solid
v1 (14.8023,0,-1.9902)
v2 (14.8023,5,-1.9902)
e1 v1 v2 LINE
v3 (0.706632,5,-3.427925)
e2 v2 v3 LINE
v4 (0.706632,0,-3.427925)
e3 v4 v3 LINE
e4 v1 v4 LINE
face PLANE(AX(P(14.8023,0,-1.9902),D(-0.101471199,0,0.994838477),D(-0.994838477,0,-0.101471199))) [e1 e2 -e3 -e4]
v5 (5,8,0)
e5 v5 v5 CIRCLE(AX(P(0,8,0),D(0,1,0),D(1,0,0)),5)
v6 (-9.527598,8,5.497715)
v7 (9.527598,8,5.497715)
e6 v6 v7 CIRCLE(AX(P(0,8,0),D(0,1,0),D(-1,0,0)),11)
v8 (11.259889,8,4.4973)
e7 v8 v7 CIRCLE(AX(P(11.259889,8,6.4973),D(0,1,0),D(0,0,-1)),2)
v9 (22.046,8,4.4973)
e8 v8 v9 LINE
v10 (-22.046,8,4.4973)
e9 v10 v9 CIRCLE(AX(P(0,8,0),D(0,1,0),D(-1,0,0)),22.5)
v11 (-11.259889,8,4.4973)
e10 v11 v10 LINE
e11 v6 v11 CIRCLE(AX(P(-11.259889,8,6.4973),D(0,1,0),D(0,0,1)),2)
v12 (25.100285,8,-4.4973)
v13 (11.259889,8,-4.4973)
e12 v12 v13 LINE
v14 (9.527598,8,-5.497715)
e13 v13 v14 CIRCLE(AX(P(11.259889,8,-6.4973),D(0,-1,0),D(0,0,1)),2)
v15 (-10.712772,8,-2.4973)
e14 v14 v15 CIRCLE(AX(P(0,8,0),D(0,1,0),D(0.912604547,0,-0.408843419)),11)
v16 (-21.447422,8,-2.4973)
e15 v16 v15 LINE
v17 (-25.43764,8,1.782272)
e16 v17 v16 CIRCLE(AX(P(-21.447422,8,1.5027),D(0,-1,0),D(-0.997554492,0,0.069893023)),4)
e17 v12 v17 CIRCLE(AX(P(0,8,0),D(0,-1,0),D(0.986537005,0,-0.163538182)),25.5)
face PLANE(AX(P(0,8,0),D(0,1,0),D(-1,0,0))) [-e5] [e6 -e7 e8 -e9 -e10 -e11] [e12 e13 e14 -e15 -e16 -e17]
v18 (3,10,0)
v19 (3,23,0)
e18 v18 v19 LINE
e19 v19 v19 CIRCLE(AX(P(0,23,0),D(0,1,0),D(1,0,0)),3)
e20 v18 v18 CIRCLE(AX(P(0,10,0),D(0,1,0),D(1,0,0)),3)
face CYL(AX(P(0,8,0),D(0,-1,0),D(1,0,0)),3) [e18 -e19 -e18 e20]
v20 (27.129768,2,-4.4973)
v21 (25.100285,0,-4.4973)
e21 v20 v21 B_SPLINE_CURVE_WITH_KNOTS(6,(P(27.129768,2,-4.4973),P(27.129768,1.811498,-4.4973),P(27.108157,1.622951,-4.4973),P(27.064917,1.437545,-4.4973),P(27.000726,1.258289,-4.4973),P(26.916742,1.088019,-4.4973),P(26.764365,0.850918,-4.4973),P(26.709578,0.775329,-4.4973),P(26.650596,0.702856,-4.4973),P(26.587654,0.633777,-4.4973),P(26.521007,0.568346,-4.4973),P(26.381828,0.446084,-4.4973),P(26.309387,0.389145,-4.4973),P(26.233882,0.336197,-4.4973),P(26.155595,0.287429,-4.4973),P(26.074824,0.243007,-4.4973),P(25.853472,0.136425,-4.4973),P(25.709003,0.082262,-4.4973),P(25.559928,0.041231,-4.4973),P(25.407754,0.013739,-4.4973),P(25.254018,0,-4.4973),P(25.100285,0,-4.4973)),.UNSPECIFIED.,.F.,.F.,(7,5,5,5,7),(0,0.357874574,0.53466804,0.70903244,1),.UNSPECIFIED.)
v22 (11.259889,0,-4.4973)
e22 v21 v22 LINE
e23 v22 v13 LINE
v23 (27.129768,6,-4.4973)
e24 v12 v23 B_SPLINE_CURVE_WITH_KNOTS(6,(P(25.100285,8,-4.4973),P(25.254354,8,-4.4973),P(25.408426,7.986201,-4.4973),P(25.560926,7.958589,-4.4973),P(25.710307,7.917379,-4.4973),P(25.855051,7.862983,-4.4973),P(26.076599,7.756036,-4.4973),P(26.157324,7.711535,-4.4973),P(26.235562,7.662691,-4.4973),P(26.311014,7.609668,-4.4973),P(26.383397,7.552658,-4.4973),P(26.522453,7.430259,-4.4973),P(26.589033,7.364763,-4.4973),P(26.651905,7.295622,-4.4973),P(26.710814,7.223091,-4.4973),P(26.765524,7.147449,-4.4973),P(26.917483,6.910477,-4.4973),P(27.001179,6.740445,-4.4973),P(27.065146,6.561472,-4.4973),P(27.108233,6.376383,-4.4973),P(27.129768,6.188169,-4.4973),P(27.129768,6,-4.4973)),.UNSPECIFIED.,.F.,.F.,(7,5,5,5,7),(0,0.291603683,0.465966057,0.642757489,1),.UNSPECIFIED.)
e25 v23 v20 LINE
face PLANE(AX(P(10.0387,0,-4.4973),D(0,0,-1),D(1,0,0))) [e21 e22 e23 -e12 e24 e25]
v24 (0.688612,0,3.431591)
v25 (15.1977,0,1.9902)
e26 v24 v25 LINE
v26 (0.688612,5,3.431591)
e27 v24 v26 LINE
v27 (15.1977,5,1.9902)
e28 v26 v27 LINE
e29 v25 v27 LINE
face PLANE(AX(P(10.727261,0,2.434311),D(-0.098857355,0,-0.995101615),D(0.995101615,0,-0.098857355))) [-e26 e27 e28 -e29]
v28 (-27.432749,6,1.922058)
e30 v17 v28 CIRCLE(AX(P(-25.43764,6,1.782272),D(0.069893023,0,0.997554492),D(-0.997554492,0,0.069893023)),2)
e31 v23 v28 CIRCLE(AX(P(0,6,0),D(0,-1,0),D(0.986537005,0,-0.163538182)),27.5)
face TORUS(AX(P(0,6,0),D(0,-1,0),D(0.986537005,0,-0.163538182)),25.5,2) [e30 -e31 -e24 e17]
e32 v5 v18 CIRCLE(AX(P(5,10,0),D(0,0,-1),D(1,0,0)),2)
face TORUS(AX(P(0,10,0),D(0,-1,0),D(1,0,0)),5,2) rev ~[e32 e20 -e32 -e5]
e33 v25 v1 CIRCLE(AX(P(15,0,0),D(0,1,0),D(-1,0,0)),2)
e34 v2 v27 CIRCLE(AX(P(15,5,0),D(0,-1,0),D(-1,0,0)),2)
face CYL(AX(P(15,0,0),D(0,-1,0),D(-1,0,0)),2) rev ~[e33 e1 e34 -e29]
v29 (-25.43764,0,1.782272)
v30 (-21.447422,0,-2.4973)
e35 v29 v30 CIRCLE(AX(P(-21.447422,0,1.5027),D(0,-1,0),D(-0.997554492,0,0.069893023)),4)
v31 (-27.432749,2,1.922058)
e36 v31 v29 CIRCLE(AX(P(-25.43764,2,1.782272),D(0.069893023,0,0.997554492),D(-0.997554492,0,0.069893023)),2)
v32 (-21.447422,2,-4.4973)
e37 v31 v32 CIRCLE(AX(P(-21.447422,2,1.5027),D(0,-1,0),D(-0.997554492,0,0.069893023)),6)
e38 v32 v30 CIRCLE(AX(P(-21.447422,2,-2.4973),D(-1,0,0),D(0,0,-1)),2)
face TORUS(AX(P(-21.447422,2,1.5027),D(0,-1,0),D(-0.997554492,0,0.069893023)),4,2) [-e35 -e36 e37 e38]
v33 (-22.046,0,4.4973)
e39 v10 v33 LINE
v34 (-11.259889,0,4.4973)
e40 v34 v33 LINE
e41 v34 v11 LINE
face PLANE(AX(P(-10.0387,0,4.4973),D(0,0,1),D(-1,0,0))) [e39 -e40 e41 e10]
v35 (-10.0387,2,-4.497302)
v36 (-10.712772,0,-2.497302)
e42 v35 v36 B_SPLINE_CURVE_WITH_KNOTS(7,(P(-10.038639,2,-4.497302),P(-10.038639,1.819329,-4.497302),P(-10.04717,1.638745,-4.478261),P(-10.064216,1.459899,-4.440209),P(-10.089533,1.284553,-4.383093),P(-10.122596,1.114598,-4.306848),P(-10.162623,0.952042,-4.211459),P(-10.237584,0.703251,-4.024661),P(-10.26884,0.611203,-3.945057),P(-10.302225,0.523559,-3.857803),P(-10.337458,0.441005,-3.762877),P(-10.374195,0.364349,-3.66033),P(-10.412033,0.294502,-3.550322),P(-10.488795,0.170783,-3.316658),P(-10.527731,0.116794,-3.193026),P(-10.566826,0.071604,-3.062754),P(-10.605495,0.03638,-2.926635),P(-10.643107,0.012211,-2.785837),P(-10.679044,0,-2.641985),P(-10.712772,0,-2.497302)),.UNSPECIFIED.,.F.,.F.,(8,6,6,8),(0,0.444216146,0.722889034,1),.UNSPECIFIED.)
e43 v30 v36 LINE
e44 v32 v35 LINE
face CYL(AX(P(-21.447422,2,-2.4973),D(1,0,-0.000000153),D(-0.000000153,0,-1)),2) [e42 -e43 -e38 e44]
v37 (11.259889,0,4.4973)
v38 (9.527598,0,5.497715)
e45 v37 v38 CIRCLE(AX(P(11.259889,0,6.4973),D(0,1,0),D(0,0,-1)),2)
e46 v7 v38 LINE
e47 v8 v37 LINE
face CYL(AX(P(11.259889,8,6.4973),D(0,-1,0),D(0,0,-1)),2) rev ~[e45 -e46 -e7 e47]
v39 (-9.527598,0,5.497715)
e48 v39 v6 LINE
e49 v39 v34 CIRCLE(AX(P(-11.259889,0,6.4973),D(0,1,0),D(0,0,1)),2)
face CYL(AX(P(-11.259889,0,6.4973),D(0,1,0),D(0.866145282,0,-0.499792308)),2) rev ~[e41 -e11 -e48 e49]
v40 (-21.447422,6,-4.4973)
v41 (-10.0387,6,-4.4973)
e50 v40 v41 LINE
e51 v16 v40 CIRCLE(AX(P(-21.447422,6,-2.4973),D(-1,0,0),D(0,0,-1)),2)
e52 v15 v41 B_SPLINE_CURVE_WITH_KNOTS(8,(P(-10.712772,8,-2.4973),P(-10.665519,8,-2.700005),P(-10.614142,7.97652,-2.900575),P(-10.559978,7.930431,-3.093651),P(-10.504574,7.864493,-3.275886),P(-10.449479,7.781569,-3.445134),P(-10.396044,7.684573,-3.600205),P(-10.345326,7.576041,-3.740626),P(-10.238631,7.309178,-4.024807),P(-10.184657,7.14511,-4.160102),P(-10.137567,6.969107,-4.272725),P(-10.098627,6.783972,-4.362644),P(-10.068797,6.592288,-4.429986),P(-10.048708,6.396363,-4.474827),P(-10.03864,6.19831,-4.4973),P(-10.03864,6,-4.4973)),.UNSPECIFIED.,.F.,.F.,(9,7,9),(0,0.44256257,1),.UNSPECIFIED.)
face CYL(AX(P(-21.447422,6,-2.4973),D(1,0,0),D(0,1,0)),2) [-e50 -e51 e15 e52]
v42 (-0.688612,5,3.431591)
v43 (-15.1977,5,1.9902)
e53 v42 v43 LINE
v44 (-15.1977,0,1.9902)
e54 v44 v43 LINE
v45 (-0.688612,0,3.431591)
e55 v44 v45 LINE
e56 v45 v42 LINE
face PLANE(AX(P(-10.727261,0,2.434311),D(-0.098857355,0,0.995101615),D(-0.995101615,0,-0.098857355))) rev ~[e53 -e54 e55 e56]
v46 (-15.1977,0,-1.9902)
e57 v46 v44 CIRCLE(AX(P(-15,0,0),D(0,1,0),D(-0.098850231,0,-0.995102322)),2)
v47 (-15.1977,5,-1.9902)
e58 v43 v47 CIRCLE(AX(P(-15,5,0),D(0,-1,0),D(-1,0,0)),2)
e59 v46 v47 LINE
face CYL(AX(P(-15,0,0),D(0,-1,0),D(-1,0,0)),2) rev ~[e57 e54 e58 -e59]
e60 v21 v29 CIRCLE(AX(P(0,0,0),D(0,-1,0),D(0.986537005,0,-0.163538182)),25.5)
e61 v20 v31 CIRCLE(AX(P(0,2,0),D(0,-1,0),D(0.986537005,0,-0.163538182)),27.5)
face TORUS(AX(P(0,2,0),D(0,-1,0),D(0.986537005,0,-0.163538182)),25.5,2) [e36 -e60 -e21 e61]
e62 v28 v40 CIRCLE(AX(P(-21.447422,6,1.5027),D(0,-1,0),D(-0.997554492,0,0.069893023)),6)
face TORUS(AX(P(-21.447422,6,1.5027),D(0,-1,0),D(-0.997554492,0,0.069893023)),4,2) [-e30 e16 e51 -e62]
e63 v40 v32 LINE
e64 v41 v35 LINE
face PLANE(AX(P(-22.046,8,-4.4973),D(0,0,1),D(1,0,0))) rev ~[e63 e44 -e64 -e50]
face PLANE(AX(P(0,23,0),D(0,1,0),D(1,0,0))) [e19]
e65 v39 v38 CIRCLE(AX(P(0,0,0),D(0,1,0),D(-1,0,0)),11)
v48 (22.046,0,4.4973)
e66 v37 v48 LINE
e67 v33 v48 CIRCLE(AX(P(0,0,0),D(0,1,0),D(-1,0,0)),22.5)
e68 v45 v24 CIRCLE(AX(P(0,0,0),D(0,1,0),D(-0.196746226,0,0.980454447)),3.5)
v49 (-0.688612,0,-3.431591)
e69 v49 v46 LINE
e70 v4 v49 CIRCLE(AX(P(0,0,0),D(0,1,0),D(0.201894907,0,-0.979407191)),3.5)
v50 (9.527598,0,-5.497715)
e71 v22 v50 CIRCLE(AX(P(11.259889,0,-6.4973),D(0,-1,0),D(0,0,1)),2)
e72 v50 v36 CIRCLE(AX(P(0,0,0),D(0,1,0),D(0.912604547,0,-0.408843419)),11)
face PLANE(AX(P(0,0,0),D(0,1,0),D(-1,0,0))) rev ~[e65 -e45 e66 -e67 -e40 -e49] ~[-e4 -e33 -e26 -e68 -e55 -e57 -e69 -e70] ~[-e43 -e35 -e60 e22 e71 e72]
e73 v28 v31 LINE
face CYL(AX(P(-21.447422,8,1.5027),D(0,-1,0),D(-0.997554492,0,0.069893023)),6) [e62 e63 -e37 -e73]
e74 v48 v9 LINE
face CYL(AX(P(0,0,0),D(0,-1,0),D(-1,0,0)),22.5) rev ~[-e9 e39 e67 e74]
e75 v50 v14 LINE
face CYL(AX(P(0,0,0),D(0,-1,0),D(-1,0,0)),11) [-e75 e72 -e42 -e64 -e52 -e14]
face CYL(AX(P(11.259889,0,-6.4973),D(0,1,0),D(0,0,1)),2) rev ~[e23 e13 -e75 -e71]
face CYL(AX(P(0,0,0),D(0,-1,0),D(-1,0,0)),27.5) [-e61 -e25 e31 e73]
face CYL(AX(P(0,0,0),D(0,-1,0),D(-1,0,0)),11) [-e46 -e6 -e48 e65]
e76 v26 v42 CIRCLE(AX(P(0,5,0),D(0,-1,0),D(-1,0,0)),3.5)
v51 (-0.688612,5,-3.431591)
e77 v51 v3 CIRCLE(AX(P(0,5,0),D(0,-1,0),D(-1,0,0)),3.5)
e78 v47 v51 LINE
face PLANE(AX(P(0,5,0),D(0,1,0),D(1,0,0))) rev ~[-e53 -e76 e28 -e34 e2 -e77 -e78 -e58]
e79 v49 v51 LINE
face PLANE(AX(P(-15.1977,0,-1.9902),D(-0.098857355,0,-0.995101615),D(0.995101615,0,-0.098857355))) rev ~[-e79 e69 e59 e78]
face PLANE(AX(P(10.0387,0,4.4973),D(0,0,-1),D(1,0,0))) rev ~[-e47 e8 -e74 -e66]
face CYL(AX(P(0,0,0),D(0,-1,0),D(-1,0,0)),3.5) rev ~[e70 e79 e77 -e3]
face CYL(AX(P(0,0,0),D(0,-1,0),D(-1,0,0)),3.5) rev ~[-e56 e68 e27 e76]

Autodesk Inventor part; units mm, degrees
ref_plane "XZ Plane" through (0, 0, 0) normal (0, 1, 0) x (-1, 0, 0)
ref_plane "XY Plane" through (0, 0, 0) normal (0, 0, 1) x (1, 0, 0)
sketch "Skizze1" plane through (0, 0, 0) normal (0, 1, 0) x (-1, 0, 0)
  circle A0 centre (0, 0) radius 27.5
  circle A1 centre (0, 0) radius 22.5
  circle A2 centre (0, 0) radius 3.5
  line L0 (45.7225, 0) -> (-63.662, 0) construction
  line L1 (0, 78.2374) -> (0, -78.2374) construction
  circle A3 centre (15, 0) radius 2
  circle A4 centre (-15, 0) radius 2
  line L2 (0, 3.5) -> (15.1977, 1.9902)
  line L3 (15.1977, -1.9902) -> (0, -3.5)
  line L4 (-14.8023, -1.9902) -> (0, -3.5)
  line L5 (0, 3.5) -> (-15.1977, 1.9902)
  circle A5 centre (0, 0) radius 11
  line L6 (10.0387, 4.4973) -> (22.046, 4.4973)
  line L7 (-10.0387, 4.4973) -> (-22.046, 4.4973)
  line L8 (10.0387, -4.4973) -> (22.046, -4.4973)
  line L9 (-10.0387, -4.4973) -> (-22.046, -4.4973)
  point P0 (27.1298, 4.4973)
  point P1 (-27.023, -5.1)
  point P2 (13.75, -23.8157)
  point P3 (-13.75, 23.8157)
  point P4 (-0.6886, 3.4316)
  point P5 (0.6886, 3.4316)
  point P6 (0.6886, -3.4316)
  point P7 (-0.7066, -3.4279)
  dimension "d0" = 55
  dimension "d1" = 45
  dimension "d2" = 7
  dimension "d3" = 4
  dimension "d4" = 4
  dimension "d5" = 15
  dimension "d6" = 22
ref_plane "Arbeitsebene1" through (0, 3.7, 0) normal (0, 1, 0) x (1, 0, 0)
extrude "Extrusion3" add sketch "Skizze1" along normal blind 8 contours A0 | A1 L8 A5 L3 A3 L2 L6 | L7 A5 L5 A4 L4 L9 A1 | A5 L2 A2 L5 | A5 L4 A2 L3
sketch "Skizze3" plane through (0, 8, 0) normal (0, 1, 0) x (1, 0, 0)
  arc A0 (22.046, 4.4973) -> (-22.046, 4.4973) centre (0, 0) ccw projected
  arc A1 (-22.046, -4.4973) -> (22.046, -4.4973) centre (0, 0) ccw projected
  line L0 (-22.046, 4.4973) -> (22.046, 4.4973)
  line L1 (22.046, 4.4973) -> (22.046, -4.4973)
  line L2 (22.046, -4.4973) -> (-22.046, -4.4973)
  line L3 (-22.046, -4.4973) -> (-22.046, 4.4973)
extrude "Extrusion4" add sketch "Skizze3" against normal blind 3 contours L1 L2 L3 L0
sketch "Skizze7" plane through (0, 8, 0) normal (0, 1, 0) x (1, 0, 0)
  arc A0 (22.046, 4.4973) -> (-22.046, 4.4973) centre (0, 0) ccw projected
  line L0 (-22.046, 4.4973) -> (-27.1298, 4.4973)
  circle A1 centre (0, 0) radius 27.5 projected
  line L1 (22.046, 4.4973) -> (10.0387, 4.4973) projected
  line L2 (22.046, 4.4973) -> (27.1412, 4.4973)
  line L3 (27.1412, 4.4973) -> (9.9712, 4.4973)
  arc A2 (10.0387, 4.4973) -> (-10.0387, 4.4973) centre (0, 0) ccw projected
  line L4 (-22.046, 4.4973) -> (-10.0387, 4.4973)
  circle A3 centre (0, 0) radius 11
  circle A4 centre (0, 0) radius 27.5
  point P0 (27.1298, 4.4973)
extrude "Extrusion8" cut sketch "Skizze7" against normal blind 10 contours L1 A2 L4 A0 | A0 L0 A1 L2
fillet "Rundung8" radius 6 1 edges at (-27.1298, 4, -4.4973)
fillet "Rundung9" radius 2 6 edges at (-25.8358, 0, -2.589) (-15.743, 0, -4.4973) (3.2133, 0, 27.3116) (-25.8358, 8, -2.589) (-15.743, 8, -4.4973) (3.2133, 8, 27.3116)
sketch "Skizze9" plane through (0, 8, 0) normal (0, 1, 0) x (1, 0, 0)
  circle A0 centre (0, 0) radius 3
  dimension "d47" = 6
extrude "Extrusion9" add sketch "Skizze9" along normal blind 15
fillet "Rundung10" radius 2 3 edges at (10.0387, 4, 4.4973) (10.0387, 4, -4.4973) (-10.0387, 4, 4.4973)
fillet "Rundung11" radius 2 1 edges at (-3, 8, 0)
ref_plane "Arbeitsebene4" through (0, 0, 0) normal (1, 0, 0) x (0, 1, 0)
sketch "Skizze10" plane through (27.1298, 2, -4.4973) normal (0, 0, -1) x (-1, 0, 0)
  line L0 (0, 0) -> (0, 4) projected
  line L1 (0, 2) -> (17.4598, 2)
  circle A0 centre (6, 2) radius 3
  point P0 (27.1298, -2)
  dimension "d53" = 6
  dimension "d54" = 6
sketch "Skizze11" plane through (0, 0, 0) normal (1, 0, 0) x (0, 1, 0)
  line L0 (4, -48.7659) -> (4, 34.6929) construction
  line L1 (8, -11) -> (8, -2.4973) construction
  circle A0 centre (4, -19) radius 2
  point P0 (0, 0)
  point P1 (8, -5.4977)
  dimension "d55" = 4
  dimension "d56" = 4
  dimension "d57" = 8
sketch "Skizze12" plane through (0, 3.7, 0) normal (0, 1, 0) x (1, 0, 0)
  arc A0 (-25.4376, -1.7823) -> (25.1003, 4.4973) centre (0, 0) ccw projected
  spline S0 degree 2 poles (25.1003, 4.4973) (21.7392, 19.3697) (0, 19.7453) knots 0 0 0 1 1 1
  point P0 (18.4599, 14.8701)
properties part number "_3D-Druck"
